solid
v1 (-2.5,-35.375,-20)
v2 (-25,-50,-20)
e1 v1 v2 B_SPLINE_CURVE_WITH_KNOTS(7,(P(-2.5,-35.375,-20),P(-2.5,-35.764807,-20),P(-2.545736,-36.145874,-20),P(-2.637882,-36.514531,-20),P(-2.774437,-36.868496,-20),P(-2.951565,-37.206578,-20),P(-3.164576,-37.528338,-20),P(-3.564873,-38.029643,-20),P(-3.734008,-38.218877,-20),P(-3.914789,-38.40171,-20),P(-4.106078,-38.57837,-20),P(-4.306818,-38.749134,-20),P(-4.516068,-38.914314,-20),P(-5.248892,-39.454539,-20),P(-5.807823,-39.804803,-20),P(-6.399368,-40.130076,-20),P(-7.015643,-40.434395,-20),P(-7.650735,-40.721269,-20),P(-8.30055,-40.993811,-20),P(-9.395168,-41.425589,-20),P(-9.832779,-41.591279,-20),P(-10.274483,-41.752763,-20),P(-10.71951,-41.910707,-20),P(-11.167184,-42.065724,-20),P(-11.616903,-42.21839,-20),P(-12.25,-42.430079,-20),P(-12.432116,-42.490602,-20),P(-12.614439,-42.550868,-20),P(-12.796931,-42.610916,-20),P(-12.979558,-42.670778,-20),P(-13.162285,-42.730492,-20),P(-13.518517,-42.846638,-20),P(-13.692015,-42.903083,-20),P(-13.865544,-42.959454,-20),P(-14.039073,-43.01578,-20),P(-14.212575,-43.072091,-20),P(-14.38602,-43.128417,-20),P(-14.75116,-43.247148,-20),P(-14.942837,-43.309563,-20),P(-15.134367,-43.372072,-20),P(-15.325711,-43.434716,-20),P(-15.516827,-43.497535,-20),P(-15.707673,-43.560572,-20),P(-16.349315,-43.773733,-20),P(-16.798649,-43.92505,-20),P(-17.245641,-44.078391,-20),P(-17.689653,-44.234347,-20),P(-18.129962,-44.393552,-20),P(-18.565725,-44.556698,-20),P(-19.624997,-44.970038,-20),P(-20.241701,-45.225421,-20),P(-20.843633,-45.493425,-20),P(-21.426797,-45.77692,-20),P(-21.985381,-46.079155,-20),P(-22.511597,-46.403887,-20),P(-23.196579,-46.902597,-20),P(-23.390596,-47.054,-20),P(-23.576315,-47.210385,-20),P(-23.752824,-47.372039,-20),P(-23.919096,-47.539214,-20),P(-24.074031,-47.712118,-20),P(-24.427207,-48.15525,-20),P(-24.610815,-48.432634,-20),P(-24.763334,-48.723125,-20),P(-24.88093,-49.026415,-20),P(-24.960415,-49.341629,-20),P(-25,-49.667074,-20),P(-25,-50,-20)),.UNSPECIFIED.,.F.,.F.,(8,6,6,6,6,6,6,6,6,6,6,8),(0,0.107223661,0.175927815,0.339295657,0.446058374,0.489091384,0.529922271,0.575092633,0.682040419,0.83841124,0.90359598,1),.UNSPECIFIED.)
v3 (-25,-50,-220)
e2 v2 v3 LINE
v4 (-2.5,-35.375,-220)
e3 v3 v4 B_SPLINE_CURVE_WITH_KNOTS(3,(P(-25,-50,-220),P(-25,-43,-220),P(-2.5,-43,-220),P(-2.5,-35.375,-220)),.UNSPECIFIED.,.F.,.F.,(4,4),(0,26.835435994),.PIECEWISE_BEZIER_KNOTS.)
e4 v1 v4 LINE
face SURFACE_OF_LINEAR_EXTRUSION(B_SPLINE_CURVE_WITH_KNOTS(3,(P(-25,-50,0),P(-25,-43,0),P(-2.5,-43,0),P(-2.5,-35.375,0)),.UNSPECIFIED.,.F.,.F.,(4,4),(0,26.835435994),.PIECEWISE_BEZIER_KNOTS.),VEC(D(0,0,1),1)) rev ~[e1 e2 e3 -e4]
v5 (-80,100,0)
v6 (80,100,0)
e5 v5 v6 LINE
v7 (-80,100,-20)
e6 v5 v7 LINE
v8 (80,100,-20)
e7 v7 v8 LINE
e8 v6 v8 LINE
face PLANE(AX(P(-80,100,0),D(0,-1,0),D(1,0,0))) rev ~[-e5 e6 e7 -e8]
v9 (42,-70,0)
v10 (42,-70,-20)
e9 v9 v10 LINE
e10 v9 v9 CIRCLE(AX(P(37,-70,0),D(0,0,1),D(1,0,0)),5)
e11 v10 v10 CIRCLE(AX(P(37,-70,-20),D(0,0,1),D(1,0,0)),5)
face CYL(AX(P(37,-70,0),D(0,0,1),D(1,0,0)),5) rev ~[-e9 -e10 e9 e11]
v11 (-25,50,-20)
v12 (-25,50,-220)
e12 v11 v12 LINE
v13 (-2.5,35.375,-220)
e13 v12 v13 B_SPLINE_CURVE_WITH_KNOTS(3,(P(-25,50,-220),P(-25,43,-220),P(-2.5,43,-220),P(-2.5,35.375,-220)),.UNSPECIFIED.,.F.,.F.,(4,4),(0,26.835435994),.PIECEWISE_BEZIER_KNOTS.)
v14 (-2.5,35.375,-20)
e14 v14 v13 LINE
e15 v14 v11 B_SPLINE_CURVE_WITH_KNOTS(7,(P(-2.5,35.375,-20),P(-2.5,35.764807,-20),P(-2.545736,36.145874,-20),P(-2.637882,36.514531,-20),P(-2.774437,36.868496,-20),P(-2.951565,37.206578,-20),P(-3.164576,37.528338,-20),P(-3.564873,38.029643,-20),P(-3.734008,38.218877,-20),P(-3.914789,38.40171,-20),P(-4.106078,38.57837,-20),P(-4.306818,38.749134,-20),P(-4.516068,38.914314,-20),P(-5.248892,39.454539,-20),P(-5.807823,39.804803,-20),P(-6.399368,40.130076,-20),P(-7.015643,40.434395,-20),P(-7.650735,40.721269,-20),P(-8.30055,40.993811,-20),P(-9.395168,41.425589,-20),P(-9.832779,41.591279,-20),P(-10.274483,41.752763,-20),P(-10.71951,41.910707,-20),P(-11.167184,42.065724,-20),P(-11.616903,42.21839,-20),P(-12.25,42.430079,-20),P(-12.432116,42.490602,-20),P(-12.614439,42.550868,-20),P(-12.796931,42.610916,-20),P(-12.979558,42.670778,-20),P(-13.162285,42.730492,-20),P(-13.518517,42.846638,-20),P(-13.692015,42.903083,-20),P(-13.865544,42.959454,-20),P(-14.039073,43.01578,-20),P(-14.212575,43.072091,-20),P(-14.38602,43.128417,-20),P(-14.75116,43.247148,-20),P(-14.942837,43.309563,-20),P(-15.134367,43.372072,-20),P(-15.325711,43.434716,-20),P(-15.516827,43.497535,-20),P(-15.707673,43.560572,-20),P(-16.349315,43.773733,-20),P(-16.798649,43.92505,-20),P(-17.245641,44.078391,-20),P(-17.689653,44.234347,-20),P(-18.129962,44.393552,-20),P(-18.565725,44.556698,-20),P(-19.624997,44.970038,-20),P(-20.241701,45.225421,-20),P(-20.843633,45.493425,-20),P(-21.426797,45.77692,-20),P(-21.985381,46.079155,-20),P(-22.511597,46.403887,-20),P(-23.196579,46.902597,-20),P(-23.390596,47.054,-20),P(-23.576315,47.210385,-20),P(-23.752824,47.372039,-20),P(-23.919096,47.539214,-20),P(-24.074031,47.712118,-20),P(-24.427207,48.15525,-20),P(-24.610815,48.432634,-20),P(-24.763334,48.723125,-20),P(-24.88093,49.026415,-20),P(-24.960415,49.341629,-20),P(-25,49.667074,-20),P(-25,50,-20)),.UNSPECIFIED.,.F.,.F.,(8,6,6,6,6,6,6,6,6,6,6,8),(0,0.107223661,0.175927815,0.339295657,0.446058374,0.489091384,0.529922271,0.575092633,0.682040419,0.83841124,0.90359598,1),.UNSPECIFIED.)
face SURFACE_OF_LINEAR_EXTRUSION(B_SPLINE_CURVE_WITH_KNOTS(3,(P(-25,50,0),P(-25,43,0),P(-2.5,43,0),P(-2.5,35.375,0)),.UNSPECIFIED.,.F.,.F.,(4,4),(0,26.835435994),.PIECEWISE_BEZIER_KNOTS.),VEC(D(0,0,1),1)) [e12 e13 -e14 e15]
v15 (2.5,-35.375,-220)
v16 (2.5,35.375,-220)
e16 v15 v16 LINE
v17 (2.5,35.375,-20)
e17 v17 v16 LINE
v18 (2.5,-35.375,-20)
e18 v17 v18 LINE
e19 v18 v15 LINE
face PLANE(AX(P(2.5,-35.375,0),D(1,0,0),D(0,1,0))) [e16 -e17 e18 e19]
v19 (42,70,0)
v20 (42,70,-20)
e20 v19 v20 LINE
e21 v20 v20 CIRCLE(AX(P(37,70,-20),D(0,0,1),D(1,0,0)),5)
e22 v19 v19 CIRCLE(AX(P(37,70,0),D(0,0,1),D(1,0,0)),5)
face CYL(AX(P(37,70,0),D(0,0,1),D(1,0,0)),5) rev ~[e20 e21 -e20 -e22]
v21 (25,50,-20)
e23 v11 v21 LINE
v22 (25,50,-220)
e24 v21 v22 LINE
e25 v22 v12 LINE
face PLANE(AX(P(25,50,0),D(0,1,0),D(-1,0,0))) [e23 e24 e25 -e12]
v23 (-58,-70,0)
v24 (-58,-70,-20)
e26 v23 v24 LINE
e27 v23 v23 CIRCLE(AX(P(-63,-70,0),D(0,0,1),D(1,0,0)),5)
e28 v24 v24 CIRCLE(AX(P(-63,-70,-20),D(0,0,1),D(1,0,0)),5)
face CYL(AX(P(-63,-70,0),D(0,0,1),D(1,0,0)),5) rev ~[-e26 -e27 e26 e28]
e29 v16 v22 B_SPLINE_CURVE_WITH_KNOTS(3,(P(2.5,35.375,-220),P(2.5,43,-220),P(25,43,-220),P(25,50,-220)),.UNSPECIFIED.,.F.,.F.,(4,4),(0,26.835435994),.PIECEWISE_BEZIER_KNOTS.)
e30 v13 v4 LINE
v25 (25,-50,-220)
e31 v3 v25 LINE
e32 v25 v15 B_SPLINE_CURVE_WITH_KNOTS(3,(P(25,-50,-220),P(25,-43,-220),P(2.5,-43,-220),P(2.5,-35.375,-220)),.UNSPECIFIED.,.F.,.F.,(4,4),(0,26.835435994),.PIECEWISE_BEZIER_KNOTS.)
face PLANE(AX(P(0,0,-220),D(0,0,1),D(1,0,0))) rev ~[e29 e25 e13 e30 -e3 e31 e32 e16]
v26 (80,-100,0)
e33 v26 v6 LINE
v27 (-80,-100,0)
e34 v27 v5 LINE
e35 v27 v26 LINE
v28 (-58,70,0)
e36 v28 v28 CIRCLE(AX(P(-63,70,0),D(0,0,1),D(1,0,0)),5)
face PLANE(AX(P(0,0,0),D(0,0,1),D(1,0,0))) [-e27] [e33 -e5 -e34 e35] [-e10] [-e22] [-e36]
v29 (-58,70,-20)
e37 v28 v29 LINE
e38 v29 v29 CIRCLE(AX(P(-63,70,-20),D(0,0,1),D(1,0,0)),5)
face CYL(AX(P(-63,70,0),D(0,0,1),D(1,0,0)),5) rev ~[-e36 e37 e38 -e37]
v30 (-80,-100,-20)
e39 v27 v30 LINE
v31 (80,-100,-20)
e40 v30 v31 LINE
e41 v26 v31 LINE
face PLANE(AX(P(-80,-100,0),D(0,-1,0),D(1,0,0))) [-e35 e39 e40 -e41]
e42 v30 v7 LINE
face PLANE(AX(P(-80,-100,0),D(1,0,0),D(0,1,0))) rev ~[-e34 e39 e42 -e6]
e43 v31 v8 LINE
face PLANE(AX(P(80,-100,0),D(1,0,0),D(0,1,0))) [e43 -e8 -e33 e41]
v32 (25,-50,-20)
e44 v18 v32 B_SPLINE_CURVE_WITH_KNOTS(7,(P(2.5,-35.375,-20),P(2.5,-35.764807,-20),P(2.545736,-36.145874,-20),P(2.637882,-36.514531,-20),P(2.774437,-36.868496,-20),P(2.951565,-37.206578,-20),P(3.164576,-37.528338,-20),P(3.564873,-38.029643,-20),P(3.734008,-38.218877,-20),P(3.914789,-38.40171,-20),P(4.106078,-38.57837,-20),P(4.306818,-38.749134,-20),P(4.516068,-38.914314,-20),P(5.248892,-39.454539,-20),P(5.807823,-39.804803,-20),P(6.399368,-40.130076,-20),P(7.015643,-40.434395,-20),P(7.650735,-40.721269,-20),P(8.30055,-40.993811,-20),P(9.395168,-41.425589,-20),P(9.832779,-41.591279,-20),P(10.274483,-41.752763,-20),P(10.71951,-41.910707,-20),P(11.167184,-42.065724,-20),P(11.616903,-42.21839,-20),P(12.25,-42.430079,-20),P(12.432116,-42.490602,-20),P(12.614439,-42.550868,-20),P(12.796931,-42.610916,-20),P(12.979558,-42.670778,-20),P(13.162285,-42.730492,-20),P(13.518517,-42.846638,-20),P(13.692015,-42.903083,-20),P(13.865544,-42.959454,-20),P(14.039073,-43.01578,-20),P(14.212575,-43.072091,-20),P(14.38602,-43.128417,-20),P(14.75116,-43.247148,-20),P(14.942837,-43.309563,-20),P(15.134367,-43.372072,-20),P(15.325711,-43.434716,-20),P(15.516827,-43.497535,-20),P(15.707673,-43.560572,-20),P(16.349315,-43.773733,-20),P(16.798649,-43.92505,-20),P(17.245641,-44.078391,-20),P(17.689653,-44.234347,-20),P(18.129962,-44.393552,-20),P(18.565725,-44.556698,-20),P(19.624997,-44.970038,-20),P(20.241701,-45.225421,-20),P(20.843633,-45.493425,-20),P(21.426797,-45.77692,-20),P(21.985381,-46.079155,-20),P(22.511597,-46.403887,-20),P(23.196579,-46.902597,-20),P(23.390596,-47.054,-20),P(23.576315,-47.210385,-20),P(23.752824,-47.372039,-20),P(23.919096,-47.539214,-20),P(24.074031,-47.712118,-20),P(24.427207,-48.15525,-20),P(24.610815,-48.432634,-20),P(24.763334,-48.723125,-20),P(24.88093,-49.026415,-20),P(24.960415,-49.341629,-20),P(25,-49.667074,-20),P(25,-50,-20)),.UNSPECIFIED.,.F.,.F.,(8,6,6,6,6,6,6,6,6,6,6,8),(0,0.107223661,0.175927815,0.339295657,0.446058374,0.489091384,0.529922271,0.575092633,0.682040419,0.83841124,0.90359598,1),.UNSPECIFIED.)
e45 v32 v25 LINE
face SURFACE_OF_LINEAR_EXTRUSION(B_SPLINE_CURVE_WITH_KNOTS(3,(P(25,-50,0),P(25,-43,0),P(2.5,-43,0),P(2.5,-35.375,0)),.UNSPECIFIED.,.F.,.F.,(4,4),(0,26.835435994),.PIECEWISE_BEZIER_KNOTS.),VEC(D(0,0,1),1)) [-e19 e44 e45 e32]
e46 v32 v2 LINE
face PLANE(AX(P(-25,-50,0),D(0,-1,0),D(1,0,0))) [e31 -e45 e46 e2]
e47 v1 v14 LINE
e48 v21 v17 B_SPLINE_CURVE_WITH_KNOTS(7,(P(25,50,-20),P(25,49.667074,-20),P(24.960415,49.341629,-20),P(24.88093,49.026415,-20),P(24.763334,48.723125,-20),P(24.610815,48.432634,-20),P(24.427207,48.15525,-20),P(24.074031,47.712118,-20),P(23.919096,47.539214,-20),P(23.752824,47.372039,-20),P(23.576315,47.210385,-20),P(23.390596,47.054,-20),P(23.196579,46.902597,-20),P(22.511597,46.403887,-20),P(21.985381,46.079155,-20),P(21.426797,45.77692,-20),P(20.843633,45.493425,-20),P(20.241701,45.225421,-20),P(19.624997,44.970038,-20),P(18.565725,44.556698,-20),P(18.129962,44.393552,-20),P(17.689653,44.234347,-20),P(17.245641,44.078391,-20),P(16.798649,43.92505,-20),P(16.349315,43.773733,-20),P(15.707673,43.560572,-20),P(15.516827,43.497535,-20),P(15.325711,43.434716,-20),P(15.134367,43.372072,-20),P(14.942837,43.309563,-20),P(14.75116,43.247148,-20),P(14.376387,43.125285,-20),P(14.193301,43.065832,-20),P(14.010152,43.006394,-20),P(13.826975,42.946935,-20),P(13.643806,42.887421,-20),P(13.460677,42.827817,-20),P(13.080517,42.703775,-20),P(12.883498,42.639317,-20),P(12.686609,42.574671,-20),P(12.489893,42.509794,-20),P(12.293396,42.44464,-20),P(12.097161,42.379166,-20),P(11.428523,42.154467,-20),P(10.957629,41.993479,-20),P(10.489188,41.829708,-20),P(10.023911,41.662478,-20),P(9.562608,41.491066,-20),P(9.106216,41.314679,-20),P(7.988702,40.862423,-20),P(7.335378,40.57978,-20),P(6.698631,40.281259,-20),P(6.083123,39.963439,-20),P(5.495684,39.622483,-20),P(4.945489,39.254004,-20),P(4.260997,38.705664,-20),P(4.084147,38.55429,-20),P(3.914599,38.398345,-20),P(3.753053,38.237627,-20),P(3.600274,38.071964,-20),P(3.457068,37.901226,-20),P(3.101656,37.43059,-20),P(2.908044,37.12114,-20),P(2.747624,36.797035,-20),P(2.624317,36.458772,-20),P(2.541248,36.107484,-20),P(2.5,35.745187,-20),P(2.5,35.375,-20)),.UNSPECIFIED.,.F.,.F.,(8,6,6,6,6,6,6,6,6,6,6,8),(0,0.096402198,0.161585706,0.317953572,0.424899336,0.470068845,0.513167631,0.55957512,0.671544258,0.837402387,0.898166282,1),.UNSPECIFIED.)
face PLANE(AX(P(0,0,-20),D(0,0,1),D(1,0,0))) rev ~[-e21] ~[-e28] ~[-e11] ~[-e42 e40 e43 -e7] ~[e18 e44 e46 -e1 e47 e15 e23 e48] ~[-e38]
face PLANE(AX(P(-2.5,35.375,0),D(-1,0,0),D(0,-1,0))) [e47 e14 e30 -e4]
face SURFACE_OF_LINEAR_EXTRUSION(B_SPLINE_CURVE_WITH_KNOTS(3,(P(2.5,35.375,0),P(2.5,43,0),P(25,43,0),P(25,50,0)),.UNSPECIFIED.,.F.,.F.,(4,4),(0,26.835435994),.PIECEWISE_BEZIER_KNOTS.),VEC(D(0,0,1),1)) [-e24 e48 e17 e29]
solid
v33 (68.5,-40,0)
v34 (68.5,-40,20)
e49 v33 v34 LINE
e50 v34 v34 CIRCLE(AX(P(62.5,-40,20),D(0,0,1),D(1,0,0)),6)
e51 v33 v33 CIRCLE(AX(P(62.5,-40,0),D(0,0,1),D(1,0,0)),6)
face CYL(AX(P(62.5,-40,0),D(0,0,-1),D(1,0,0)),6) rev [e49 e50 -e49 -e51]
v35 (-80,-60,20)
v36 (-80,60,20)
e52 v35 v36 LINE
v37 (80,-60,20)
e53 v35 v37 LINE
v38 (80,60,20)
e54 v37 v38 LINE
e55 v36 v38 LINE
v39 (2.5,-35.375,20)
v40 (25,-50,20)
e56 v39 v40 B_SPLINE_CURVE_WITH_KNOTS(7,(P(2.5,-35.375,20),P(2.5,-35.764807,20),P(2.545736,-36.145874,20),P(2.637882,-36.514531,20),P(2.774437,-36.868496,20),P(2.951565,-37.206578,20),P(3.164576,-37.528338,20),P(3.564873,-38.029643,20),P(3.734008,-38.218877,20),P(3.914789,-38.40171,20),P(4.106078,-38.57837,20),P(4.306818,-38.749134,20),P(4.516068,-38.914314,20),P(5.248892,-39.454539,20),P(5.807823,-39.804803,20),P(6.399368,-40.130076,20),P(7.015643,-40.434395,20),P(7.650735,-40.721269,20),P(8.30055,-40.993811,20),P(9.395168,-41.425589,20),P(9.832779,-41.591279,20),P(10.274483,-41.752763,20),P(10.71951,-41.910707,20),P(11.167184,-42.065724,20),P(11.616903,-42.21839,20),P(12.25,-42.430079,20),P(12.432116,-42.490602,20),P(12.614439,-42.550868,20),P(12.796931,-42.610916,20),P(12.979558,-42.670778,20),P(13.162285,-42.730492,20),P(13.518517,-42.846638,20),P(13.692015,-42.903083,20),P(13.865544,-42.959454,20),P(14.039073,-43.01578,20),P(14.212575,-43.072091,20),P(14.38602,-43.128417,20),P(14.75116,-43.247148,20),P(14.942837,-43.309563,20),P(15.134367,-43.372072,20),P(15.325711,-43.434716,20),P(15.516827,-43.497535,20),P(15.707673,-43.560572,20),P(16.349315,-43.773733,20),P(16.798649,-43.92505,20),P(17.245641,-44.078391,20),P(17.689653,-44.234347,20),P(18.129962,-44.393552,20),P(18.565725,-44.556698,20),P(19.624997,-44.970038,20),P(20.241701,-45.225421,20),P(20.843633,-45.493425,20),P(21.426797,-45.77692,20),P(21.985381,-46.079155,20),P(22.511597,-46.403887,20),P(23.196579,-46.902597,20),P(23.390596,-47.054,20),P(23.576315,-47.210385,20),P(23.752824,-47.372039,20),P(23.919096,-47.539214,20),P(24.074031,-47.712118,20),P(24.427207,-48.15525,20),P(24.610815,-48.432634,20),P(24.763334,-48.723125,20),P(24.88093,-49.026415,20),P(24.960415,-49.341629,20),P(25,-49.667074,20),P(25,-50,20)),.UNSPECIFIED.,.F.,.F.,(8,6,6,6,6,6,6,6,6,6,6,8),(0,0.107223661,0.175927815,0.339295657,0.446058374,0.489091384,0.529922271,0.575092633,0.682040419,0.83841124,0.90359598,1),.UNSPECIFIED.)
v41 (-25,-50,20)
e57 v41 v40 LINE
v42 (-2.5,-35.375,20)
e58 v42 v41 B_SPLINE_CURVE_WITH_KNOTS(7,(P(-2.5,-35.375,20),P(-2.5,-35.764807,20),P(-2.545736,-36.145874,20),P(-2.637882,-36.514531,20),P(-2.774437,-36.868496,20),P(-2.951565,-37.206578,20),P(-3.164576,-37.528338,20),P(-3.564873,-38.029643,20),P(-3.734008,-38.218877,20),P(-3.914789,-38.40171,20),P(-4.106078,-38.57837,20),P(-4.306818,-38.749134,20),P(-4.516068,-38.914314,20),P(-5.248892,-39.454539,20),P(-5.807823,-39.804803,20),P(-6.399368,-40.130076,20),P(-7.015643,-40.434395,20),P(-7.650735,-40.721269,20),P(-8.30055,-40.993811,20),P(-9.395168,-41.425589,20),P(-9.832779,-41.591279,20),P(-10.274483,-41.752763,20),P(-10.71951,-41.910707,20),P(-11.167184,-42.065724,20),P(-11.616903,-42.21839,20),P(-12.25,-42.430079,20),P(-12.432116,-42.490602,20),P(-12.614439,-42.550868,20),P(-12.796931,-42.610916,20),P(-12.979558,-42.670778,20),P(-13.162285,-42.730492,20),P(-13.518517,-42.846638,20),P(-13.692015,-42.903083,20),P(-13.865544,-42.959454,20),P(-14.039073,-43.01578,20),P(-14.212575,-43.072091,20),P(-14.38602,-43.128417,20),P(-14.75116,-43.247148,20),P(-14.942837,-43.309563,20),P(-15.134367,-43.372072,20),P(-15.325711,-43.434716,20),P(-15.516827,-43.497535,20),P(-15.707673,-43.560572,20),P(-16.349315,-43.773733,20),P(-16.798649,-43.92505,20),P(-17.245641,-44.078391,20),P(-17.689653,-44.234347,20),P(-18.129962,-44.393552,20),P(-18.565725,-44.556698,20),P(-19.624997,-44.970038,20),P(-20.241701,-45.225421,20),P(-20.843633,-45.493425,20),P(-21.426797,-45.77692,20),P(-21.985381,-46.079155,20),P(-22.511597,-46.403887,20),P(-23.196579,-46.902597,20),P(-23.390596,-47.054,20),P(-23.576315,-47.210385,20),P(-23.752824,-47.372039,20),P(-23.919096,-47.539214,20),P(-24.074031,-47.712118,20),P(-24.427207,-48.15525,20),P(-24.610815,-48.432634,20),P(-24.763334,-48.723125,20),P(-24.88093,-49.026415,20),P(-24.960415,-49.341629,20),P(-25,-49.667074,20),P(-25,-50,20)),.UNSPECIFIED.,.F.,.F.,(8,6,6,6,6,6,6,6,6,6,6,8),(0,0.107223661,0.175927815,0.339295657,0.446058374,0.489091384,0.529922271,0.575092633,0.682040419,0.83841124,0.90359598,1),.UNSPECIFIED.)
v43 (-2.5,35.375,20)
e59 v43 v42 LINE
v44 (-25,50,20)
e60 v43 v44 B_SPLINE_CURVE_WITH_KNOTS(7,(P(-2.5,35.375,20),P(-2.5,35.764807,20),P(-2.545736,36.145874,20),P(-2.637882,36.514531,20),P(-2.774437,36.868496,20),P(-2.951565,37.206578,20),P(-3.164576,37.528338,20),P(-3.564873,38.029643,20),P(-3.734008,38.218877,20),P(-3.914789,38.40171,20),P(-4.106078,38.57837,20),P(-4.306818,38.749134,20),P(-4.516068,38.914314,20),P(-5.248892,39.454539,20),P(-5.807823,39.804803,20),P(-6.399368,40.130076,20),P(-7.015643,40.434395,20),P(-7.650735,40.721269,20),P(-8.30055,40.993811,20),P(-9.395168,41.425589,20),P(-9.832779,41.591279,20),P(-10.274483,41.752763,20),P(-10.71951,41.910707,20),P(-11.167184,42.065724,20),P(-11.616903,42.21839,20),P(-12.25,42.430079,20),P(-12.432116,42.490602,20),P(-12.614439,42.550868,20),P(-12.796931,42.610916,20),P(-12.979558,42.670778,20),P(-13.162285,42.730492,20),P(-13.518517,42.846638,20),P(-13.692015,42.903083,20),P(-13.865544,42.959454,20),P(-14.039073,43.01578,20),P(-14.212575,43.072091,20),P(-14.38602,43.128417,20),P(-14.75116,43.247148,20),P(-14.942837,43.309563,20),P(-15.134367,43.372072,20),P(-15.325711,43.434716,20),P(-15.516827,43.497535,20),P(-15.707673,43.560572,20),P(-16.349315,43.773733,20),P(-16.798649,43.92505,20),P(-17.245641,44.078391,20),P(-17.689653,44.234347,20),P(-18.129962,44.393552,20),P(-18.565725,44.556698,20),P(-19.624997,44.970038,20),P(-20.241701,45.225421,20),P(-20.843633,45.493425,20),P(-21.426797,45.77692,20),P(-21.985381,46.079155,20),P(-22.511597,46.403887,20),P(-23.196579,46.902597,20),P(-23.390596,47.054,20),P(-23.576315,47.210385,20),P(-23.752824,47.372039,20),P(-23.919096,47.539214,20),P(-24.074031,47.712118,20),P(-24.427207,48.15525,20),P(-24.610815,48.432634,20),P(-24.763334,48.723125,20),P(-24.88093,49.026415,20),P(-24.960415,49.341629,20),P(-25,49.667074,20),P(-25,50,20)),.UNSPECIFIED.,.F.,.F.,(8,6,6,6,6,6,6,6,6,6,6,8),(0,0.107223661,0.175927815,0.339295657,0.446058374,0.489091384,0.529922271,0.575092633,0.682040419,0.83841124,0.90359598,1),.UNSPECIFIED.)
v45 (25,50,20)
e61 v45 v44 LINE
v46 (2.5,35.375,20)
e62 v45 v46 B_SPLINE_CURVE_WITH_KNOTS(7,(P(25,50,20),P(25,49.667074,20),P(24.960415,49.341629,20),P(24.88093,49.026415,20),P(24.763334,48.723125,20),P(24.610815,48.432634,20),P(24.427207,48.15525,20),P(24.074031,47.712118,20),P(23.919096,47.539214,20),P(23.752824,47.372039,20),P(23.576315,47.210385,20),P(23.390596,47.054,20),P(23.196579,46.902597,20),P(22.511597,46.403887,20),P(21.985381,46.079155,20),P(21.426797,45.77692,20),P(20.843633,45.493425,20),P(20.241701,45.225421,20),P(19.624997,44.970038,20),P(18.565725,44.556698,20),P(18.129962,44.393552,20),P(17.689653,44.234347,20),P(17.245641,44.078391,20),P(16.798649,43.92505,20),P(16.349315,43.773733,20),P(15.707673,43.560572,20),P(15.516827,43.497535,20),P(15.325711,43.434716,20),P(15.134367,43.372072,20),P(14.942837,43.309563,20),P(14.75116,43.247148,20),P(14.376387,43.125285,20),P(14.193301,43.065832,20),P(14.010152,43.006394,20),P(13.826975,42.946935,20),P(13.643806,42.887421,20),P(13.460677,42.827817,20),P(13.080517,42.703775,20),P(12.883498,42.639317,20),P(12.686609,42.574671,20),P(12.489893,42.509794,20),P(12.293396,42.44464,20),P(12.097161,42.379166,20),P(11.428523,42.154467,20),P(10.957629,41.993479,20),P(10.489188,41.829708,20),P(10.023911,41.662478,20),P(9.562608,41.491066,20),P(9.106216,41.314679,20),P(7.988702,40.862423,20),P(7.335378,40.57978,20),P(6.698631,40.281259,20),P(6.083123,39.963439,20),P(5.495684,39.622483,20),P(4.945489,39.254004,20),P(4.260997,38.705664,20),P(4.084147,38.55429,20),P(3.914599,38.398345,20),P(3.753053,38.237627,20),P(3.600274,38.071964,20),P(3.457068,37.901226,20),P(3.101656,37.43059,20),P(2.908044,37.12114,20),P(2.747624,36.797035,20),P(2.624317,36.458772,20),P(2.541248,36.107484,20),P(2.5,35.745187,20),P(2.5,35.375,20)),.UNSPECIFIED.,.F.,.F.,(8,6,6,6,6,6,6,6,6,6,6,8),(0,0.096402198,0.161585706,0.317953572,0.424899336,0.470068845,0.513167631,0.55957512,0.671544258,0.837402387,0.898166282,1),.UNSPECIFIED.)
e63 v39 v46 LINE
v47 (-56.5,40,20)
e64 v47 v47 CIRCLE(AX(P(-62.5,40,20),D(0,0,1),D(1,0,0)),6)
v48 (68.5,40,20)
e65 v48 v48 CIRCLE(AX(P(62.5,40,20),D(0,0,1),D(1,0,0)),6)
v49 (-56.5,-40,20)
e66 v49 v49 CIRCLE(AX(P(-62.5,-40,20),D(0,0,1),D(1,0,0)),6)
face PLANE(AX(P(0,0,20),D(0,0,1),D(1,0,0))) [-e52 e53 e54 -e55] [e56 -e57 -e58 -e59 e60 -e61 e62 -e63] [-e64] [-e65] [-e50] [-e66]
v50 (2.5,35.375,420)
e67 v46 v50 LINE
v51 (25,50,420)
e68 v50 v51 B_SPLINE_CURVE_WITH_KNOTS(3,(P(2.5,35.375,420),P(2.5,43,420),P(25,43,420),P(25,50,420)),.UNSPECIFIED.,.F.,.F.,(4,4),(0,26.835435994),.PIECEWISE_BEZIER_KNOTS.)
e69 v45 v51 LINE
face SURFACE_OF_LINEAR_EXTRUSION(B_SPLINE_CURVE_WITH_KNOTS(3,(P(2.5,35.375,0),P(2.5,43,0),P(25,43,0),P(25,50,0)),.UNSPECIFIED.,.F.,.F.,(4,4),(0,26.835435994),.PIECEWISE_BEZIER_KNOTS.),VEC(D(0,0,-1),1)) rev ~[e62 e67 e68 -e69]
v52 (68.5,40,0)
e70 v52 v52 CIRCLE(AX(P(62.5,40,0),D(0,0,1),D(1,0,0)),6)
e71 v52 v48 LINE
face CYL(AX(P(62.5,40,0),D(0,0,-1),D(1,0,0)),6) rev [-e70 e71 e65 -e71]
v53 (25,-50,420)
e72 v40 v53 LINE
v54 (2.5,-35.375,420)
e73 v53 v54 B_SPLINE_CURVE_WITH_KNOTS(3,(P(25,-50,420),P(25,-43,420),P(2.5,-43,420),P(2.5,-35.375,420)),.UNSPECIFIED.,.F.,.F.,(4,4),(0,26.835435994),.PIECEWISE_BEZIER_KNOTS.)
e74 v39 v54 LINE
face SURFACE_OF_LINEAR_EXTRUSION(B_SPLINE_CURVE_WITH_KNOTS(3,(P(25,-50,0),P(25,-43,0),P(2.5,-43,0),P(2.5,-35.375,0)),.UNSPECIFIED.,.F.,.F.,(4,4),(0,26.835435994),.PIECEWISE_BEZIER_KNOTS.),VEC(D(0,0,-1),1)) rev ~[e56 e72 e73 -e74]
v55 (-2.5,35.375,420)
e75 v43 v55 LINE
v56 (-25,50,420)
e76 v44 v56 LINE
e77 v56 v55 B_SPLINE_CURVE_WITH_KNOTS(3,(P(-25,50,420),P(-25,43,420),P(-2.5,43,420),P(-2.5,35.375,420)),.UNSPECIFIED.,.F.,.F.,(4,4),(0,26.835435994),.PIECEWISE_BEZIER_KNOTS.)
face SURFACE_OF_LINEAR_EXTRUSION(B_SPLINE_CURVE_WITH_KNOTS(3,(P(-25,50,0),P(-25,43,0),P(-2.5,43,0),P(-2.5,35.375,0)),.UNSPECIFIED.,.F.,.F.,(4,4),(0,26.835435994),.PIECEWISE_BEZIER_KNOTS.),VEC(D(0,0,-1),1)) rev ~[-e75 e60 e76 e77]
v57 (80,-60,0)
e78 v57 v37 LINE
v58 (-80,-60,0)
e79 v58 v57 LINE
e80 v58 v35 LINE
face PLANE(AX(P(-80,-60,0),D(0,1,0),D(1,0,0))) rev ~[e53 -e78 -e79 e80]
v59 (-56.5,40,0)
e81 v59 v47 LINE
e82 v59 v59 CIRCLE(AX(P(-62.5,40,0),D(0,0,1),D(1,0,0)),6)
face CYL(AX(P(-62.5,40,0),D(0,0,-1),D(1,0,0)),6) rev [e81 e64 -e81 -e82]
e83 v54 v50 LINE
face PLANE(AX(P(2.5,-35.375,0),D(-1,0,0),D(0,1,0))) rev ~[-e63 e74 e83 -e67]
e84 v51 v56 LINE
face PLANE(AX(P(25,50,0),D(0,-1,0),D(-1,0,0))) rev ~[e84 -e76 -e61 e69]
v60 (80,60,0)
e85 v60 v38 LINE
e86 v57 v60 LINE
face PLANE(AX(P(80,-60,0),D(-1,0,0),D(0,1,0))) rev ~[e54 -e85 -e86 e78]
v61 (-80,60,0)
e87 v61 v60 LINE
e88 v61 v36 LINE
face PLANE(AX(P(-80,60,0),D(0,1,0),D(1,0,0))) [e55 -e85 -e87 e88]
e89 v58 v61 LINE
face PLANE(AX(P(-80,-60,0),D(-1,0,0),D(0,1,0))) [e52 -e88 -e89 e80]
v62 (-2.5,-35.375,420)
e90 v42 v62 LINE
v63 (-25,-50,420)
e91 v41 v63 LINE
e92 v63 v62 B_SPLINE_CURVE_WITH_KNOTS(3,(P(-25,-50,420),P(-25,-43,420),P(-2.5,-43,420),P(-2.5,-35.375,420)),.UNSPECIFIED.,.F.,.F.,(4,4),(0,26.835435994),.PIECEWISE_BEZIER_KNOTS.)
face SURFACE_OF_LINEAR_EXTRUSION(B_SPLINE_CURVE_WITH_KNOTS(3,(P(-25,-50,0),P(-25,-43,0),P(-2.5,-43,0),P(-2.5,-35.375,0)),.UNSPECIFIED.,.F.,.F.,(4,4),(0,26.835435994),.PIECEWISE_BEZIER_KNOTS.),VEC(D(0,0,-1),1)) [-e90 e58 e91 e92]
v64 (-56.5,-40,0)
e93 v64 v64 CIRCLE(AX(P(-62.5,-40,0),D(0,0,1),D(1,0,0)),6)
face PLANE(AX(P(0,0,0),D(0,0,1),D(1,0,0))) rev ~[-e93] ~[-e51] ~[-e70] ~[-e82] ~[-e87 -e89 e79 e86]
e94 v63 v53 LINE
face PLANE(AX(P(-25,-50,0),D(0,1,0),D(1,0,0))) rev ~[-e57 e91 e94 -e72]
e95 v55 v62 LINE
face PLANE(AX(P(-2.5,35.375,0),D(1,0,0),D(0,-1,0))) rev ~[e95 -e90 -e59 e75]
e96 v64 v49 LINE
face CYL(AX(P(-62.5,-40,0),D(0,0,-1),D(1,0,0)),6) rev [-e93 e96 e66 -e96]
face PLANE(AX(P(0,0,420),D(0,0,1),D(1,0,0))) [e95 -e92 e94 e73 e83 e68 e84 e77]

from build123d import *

# Parameters (mm, degrees)
F1_DEPTH = 420
F0_W     = 160
F0_H     = 120
F0_R     = 6
F2_DEPTH = 20
F3_DEPTH = 220
F4_W     = 160
F4_H     = 200
F4_R     = 5
F5_DEPTH = 20


with BuildPart() as f1:
    # F0 (on Top) → F1 (new body)
    with BuildSketch(Plane.XY):
        with BuildLine():
            Line((25, 50), (-25, 50))
            add(Edge.make_bspline(
                [(-25, 50), (-25, 43), (-2.5, 43), (-2.5, 35.375)],
                knots=[0, 0, 0, 0, 26.8354359942, 26.8354359942, 26.8354359942, 26.8354359942], degree=3))
            Line((-2.5, 35.375), (-2.5, -35.375))
            add(Edge.make_bspline(
                [(-25, -50), (-25, -43), (-2.5, -43), (-2.5, -35.375)],
                knots=[0, 0, 0, 0, 26.8354359942, 26.8354359942, 26.8354359942, 26.8354359942], degree=3))
            Line((-25, -50), (25, -50))
            add(Edge.make_bspline(
                [(25, -50), (25, -43), (2.5, -43), (2.5, -35.375)],
                knots=[0, 0, 0, 0, 26.8354359942, 26.8354359942, 26.8354359942, 26.8354359942], degree=3))
            Line((2.5, -35.375), (2.5, 35.375))
            add(Edge.make_bspline(
                [(2.5, 35.375), (2.5, 43), (25, 43), (25, 50)],
                knots=[0, 0, 0, 0, 26.8354359942, 26.8354359942, 26.8354359942, 26.8354359942], degree=3))
        make_face()
    extrude(amount=F1_DEPTH)

    # F0 (on Top) → F2 (join)
    with BuildSketch(Plane.XY):
        Rectangle(F0_W, F0_H)
        with Locations((-62.5, -40)):
            Circle(F0_R, mode=Mode.SUBTRACT)
        with Locations((62.5, -40)):
            Circle(F0_R, mode=Mode.SUBTRACT)
        with Locations((-62.5, 40)):
            Circle(F0_R, mode=Mode.SUBTRACT)
        with BuildLine():
            add(Edge.make_bspline(
                [(-25, 50), (-25, 43), (-2.5, 43), (-2.5, 35.375)],
                knots=[0, 0, 0, 0, 26.8354359942, 26.8354359942, 26.8354359942, 26.8354359942], degree=3))
            Line((-25, 50), (25, 50))
            add(Edge.make_bspline(
                [(2.5, 35.375), (2.5, 43), (25, 43), (25, 50)],
                knots=[0, 0, 0, 0, 26.8354359942, 26.8354359942, 26.8354359942, 26.8354359942], degree=3))
            Line((2.5, 35.375), (2.5, -35.375))
            add(Edge.make_bspline(
                [(25, -50), (25, -43), (2.5, -43), (2.5, -35.375)],
                knots=[0, 0, 0, 0, 26.8354359942, 26.8354359942, 26.8354359942, 26.8354359942], degree=3))
            Line((25, -50), (-25, -50))
            add(Edge.make_bspline(
                [(-25, -50), (-25, -43), (-2.5, -43), (-2.5, -35.375)],
                knots=[0, 0, 0, 0, 26.8354359942, 26.8354359942, 26.8354359942, 26.8354359942], degree=3))
            Line((-2.5, -35.375), (-2.5, 35.375))
        make_face(mode=Mode.SUBTRACT)
        with Locations((62.5, 40)):
            Circle(F0_R, mode=Mode.SUBTRACT)
        with BuildLine():
            Line((25, 50), (-25, 50))
            add(Edge.make_bspline(
                [(-25, 50), (-25, 43), (-2.5, 43), (-2.5, 35.375)],
                knots=[0, 0, 0, 0, 26.8354359942, 26.8354359942, 26.8354359942, 26.8354359942], degree=3))
            Line((-2.5, 35.375), (-2.5, -35.375))
            add(Edge.make_bspline(
                [(-25, -50), (-25, -43), (-2.5, -43), (-2.5, -35.375)],
                knots=[0, 0, 0, 0, 26.8354359942, 26.8354359942, 26.8354359942, 26.8354359942], degree=3))
            Line((-25, -50), (25, -50))
            add(Edge.make_bspline(
                [(25, -50), (25, -43), (2.5, -43), (2.5, -35.375)],
                knots=[0, 0, 0, 0, 26.8354359942, 26.8354359942, 26.8354359942, 26.8354359942], degree=3))
            Line((2.5, -35.375), (2.5, 35.375))
            add(Edge.make_bspline(
                [(2.5, 35.375), (2.5, 43), (25, 43), (25, 50)],
                knots=[0, 0, 0, 0, 26.8354359942, 26.8354359942, 26.8354359942, 26.8354359942], degree=3))
        make_face()
    extrude(amount=F2_DEPTH)


with BuildPart() as f3:
    # F0 (on Top) → F3 (new body)
    with BuildSketch(Plane.XY):
        with BuildLine():
            Line((25, 50), (-25, 50))
            add(Edge.make_bspline(
                [(-25, 50), (-25, 43), (-2.5, 43), (-2.5, 35.375)],
                knots=[0, 0, 0, 0, 26.8354359942, 26.8354359942, 26.8354359942, 26.8354359942], degree=3))
            Line((-2.5, 35.375), (-2.5, -35.375))
            add(Edge.make_bspline(
                [(-25, -50), (-25, -43), (-2.5, -43), (-2.5, -35.375)],
                knots=[0, 0, 0, 0, 26.8354359942, 26.8354359942, 26.8354359942, 26.8354359942], degree=3))
            Line((-25, -50), (25, -50))
            add(Edge.make_bspline(
                [(25, -50), (25, -43), (2.5, -43), (2.5, -35.375)],
                knots=[0, 0, 0, 0, 26.8354359942, 26.8354359942, 26.8354359942, 26.8354359942], degree=3))
            Line((2.5, -35.375), (2.5, 35.375))
            add(Edge.make_bspline(
                [(2.5, 35.375), (2.5, 43), (25, 43), (25, 50)],
                knots=[0, 0, 0, 0, 26.8354359942, 26.8354359942, 26.8354359942, 26.8354359942], degree=3))
        make_face()
    extrude(amount=-F3_DEPTH)

    # F4 (on Top) → F5 (join)
    with BuildSketch(Plane.XY):
        Rectangle(F4_W, F4_H)
        with Locations((-63, -70)):
            Circle(F4_R, mode=Mode.SUBTRACT)
        with Locations((37, -70)):
            Circle(F4_R, mode=Mode.SUBTRACT)
        with Locations((-63, 70)):
            Circle(F4_R, mode=Mode.SUBTRACT)
        with Locations((37, 70)):
            Circle(F4_R, mode=Mode.SUBTRACT)
    extrude(amount=-F5_DEPTH)


solid = Compound([f1.part, f3.part])
